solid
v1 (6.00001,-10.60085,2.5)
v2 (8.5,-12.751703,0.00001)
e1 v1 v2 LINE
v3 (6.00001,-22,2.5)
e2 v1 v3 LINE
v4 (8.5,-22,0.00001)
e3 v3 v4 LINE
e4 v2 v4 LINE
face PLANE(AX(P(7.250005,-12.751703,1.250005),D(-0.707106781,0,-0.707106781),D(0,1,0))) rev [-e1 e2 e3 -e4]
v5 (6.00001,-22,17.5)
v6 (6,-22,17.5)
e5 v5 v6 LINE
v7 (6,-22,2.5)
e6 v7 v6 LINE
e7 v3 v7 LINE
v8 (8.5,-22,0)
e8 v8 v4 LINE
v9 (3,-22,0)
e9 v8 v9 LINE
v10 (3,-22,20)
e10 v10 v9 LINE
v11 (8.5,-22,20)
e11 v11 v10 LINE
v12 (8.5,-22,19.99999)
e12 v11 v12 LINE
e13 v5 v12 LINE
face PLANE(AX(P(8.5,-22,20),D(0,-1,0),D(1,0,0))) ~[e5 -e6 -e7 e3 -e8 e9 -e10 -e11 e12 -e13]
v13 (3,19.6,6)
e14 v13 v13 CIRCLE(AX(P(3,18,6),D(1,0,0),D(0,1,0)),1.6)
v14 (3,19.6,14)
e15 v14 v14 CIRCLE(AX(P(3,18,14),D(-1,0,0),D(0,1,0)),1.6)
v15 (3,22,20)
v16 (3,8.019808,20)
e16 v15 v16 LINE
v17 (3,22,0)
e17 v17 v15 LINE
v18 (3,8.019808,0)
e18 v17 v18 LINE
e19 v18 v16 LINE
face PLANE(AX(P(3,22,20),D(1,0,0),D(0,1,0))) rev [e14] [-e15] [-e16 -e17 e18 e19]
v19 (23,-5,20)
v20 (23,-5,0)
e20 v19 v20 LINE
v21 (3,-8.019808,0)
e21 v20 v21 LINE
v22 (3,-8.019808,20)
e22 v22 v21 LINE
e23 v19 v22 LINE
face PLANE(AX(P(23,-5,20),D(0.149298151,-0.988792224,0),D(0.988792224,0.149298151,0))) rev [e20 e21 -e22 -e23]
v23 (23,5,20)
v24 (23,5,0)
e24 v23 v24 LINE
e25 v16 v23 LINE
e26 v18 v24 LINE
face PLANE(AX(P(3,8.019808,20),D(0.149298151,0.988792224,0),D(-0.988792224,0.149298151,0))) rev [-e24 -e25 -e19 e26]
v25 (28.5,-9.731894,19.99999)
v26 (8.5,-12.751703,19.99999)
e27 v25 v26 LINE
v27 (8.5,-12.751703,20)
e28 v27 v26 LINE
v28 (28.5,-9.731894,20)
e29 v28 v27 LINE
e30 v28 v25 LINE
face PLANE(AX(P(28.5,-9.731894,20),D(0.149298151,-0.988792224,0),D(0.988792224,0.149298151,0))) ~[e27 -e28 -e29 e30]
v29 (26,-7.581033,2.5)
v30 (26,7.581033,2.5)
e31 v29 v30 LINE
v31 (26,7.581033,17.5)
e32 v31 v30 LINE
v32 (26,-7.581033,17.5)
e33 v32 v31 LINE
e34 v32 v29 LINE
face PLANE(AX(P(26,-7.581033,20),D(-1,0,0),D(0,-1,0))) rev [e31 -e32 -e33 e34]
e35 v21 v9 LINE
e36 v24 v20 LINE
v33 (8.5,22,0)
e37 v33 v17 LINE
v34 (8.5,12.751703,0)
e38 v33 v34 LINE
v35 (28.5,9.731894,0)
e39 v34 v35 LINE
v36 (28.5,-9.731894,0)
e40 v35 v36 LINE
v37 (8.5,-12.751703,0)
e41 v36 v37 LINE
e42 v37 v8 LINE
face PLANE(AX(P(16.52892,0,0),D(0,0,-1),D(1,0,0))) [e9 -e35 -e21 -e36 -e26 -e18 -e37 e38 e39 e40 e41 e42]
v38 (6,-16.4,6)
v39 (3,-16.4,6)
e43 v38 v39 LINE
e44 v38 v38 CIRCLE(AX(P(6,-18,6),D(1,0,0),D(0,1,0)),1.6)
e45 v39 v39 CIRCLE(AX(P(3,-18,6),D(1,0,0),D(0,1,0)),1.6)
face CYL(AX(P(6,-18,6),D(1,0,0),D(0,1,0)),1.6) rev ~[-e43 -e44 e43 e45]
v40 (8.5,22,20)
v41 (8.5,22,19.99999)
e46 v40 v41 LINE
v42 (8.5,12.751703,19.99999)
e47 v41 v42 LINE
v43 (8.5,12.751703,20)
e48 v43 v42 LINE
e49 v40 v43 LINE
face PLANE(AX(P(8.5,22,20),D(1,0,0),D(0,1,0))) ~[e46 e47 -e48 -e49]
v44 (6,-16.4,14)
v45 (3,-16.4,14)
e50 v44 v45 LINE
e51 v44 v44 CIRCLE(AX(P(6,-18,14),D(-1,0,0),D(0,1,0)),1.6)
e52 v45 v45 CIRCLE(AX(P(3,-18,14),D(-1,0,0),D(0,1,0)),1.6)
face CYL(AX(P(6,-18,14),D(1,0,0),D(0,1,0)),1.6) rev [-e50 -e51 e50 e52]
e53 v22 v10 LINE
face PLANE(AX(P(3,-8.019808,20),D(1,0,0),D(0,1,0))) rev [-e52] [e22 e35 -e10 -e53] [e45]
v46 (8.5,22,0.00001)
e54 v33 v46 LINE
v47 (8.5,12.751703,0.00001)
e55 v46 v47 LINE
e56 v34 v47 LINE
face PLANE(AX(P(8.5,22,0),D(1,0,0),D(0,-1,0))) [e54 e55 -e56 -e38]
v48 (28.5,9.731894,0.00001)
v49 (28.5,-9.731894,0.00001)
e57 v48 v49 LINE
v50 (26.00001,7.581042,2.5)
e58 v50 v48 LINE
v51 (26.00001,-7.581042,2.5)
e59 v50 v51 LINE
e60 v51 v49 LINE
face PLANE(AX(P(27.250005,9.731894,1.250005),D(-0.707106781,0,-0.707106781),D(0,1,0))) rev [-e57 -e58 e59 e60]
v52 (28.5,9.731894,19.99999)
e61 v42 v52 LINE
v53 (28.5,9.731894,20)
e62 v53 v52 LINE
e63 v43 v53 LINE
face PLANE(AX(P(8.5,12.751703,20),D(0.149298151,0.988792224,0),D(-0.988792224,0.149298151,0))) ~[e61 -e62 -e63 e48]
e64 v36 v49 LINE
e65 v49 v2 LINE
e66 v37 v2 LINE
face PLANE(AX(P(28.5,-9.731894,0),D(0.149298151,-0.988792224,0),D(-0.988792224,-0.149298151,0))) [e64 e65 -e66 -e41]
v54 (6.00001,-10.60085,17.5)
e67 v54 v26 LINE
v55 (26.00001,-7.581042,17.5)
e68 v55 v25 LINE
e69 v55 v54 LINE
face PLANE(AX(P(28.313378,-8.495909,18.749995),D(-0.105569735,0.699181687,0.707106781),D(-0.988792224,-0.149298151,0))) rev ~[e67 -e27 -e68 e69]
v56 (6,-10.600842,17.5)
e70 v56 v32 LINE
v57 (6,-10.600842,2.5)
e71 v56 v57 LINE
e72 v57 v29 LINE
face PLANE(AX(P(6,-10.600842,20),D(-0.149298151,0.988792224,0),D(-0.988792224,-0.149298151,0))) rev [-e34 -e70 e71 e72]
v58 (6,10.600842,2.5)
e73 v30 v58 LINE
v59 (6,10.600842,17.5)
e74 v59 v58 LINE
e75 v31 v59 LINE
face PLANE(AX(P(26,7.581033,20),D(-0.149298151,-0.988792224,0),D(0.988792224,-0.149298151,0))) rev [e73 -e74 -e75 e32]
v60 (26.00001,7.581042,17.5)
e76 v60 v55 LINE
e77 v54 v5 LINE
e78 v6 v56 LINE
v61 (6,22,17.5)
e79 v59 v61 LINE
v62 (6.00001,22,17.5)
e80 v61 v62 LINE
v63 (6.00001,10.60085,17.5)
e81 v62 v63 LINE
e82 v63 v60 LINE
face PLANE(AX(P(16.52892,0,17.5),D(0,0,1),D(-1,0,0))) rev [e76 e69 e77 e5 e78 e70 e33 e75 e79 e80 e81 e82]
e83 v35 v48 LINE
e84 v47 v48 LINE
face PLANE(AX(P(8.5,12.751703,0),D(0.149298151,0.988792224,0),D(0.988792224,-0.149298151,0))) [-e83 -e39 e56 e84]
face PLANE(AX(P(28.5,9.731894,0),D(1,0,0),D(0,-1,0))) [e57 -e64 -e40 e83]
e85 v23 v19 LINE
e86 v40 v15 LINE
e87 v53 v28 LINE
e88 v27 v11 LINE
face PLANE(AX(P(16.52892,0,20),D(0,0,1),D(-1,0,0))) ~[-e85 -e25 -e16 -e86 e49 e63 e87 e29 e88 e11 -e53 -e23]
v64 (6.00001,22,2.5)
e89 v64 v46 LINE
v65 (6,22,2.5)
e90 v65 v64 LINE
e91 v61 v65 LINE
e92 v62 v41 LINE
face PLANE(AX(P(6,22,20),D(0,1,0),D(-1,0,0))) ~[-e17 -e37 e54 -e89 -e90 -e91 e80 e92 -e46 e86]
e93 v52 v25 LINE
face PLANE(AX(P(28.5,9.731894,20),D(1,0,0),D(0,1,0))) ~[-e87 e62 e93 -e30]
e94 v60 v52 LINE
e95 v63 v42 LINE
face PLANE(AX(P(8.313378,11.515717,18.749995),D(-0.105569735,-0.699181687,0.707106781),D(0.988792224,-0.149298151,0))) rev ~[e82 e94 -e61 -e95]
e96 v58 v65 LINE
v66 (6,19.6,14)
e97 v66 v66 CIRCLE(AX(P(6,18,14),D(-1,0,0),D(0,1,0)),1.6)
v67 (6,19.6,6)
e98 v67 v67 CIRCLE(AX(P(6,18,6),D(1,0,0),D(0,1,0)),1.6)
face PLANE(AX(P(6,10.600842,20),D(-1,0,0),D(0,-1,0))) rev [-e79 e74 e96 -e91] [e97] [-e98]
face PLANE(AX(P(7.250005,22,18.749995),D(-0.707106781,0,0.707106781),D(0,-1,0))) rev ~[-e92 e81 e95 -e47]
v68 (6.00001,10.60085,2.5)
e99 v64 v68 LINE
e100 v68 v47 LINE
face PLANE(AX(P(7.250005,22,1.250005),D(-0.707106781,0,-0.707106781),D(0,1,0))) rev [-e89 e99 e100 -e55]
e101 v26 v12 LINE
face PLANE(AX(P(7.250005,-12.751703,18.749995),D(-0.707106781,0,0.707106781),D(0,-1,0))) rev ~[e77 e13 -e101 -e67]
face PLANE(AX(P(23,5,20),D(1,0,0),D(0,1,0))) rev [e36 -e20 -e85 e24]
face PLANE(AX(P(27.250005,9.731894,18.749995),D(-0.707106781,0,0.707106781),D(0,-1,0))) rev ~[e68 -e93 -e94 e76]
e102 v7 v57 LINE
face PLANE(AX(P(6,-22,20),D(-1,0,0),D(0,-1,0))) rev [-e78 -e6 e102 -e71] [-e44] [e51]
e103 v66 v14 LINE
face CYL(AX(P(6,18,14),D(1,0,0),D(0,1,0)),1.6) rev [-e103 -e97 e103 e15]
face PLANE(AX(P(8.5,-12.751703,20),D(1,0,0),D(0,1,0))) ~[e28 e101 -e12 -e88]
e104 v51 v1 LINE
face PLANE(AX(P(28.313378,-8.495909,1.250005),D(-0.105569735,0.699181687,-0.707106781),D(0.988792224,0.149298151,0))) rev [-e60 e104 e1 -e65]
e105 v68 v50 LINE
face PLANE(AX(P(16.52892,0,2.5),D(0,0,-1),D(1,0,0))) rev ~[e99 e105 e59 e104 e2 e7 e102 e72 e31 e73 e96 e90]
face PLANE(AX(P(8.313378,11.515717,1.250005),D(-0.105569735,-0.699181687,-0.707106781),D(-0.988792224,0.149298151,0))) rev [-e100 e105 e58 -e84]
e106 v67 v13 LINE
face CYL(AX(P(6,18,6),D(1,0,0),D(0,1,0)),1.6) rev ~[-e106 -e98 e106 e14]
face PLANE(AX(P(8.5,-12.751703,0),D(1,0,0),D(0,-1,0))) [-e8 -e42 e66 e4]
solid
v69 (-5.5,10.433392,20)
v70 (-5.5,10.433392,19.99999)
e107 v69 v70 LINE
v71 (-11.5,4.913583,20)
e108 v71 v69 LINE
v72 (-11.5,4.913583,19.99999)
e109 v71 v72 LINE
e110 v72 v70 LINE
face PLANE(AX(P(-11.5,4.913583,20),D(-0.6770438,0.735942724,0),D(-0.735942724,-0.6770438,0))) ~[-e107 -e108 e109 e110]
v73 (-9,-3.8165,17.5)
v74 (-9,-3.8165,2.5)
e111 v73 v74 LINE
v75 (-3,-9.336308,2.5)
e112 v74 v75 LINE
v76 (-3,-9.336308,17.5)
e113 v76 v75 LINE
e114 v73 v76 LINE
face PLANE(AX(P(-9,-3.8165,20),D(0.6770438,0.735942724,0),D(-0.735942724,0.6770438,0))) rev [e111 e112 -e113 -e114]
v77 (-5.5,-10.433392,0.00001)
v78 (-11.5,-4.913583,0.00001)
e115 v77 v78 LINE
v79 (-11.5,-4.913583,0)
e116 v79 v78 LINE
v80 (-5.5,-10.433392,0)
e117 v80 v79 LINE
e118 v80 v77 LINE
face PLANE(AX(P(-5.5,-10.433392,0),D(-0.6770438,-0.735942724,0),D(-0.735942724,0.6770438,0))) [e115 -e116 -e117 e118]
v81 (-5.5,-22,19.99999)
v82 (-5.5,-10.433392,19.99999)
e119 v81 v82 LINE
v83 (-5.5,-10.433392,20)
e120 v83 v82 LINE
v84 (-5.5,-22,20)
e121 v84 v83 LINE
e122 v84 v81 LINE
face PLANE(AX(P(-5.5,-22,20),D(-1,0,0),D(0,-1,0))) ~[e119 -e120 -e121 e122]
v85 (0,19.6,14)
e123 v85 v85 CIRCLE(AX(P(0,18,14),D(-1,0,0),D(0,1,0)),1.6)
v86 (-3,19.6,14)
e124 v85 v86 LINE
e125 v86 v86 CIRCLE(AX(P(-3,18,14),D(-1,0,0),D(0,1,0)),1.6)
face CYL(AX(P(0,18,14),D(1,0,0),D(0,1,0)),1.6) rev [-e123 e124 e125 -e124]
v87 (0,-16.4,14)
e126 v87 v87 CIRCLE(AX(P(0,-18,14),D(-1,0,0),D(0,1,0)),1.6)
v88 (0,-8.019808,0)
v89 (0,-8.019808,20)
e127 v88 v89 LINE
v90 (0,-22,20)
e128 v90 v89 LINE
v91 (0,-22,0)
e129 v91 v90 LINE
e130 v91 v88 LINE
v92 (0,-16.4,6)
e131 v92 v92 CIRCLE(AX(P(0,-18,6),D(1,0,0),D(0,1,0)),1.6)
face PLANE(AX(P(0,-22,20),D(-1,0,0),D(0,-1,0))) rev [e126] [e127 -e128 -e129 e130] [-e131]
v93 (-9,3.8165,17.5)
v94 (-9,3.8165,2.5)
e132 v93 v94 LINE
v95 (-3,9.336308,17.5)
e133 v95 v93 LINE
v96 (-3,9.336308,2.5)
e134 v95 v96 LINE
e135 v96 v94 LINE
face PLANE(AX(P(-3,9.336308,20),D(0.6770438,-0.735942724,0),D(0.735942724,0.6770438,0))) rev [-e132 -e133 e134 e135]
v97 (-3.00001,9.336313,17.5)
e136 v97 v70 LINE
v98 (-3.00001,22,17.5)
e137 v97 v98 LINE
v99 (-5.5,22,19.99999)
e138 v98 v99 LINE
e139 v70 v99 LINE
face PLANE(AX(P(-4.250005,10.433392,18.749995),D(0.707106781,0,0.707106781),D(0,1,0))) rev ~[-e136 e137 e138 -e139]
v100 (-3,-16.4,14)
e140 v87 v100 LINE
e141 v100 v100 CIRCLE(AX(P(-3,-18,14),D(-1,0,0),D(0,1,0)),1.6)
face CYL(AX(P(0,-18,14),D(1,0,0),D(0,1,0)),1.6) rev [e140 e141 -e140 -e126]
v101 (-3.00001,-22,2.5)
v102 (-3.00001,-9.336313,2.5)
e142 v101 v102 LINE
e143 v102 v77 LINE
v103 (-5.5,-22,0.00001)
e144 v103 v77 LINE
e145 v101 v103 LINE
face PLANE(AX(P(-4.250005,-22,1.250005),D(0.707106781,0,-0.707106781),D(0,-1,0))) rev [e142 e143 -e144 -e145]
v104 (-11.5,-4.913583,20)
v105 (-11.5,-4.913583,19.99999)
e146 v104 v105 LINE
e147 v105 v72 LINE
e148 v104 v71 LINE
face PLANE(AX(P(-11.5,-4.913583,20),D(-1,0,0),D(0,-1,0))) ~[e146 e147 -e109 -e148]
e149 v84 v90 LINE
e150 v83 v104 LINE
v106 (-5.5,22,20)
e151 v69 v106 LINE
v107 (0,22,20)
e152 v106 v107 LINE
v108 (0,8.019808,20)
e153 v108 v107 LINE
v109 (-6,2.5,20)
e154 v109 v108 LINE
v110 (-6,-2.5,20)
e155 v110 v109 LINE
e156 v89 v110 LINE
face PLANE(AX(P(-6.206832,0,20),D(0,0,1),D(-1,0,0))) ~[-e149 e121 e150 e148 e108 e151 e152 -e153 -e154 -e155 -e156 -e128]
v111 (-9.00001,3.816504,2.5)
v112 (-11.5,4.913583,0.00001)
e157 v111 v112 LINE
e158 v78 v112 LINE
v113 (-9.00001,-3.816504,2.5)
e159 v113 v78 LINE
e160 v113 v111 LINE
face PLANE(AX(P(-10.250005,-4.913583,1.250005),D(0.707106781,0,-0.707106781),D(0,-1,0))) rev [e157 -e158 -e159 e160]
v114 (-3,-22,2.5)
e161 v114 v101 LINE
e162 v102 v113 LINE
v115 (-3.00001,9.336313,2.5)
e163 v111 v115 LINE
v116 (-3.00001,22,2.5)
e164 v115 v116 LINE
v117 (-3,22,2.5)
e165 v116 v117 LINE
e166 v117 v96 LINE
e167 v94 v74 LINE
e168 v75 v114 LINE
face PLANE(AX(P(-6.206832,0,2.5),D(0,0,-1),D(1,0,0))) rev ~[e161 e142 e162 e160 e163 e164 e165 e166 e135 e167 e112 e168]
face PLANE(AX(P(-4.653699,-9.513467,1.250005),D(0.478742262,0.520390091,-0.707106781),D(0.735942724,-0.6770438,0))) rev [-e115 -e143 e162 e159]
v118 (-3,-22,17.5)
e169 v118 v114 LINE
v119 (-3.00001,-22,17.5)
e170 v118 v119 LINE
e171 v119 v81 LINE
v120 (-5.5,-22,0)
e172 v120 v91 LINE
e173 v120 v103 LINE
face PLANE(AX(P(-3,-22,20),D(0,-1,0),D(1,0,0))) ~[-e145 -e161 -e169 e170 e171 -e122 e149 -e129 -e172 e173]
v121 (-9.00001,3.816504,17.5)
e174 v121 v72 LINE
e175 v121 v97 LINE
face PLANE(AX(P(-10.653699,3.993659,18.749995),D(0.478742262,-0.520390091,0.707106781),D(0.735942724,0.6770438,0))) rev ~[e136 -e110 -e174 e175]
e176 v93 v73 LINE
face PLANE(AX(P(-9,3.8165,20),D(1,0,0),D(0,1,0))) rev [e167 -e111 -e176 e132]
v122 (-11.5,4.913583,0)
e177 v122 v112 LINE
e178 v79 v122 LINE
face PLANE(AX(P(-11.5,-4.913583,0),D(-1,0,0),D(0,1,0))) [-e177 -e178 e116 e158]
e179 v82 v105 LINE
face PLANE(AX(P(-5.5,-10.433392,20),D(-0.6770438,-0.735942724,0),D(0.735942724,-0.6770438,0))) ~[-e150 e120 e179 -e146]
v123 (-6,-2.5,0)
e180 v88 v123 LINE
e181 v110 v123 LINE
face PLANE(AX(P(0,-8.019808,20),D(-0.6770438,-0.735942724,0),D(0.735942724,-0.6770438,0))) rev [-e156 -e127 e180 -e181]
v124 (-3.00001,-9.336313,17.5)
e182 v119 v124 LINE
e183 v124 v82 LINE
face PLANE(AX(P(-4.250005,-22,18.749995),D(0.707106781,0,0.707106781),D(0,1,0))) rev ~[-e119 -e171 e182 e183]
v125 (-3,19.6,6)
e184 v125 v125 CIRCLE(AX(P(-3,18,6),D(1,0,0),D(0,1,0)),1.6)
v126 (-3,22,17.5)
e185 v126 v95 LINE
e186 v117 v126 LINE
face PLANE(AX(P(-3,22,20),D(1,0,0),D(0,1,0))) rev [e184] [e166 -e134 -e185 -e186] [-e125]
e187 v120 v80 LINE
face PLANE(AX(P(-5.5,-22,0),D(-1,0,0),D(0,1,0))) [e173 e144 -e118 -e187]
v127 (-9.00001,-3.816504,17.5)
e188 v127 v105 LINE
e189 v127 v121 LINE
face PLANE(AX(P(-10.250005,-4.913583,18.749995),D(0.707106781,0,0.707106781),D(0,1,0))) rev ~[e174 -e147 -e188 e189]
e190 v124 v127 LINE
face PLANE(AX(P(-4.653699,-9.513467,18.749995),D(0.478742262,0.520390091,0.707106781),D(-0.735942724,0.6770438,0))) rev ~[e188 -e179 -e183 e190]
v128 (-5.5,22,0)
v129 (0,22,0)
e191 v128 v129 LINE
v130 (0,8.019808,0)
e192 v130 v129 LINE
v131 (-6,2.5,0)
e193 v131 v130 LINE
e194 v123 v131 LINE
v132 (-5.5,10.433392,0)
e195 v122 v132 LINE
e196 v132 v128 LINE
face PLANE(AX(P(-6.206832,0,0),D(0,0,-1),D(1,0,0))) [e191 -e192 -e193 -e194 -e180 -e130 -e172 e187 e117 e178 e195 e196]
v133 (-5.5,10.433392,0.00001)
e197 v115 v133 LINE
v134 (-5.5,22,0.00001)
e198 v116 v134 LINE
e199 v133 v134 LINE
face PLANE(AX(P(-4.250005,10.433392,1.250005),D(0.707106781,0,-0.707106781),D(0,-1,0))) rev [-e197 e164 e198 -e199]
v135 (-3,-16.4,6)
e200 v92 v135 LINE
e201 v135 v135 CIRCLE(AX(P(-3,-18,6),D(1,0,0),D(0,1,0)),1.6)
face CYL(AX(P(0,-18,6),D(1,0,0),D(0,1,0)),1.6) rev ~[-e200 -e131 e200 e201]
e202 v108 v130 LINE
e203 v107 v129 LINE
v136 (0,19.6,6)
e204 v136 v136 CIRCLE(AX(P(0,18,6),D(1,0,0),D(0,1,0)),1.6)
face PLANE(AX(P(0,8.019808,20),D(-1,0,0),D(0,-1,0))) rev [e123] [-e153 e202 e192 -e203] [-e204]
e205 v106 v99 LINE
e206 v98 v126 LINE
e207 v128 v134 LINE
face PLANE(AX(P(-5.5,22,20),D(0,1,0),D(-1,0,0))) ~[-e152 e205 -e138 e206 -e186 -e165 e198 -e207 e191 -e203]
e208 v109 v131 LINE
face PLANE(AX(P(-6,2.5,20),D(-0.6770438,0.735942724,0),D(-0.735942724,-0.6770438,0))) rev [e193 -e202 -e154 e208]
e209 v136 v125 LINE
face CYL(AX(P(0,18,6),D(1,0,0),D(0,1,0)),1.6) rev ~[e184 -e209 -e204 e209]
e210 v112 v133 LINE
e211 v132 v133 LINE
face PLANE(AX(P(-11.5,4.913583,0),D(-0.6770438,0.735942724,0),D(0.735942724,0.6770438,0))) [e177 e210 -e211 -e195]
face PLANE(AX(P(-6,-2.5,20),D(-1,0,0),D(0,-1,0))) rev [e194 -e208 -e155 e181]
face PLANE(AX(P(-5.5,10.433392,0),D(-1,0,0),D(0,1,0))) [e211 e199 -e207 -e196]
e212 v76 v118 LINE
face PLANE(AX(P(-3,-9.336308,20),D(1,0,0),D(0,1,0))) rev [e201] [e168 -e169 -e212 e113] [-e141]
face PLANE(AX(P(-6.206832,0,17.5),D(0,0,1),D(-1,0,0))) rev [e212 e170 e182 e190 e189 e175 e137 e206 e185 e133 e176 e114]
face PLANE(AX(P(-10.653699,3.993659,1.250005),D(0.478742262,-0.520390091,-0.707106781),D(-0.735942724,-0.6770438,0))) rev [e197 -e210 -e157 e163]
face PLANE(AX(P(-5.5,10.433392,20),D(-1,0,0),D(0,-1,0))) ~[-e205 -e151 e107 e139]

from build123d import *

# Parameters (mm, degrees)
F1_DEPTH   = 10
F2_R       = 1.6
F3_DEPTH   = 3
F5_DEPTH   = 10
F6_R       = 1.6
F7_DEPTH   = 3
F9_DEPTH   = 2.5
F11_DEPTH  = 2.5
F12_SIZE   = 2.49999
F12_2_SIZE = 2.49999


# Not quite as in the source:
# - a fillet or chamfer is up to 0.001 mm smaller than in the source, because OpenCascade refuses the exact size


with BuildPart() as f1:
    # F0 (on Top) → F1 (new body)
    with BuildSketch(Plane.XY):
        Polygon((-3, -22), (0, -22), (0, -8.0198083574), (-6, -2.5), (-6, 2.5), (0, 8.0198083574), (0, 22), (-3, 22), (-3, 9.3363083632), (-9, 3.8165000058), (-9, 0), (-9, -3.8165000058), (-3, -9.3363083632), align=None)
    extrude(amount=F1_DEPTH)

    # F2 (on face) → F3 (cut, through all)
    with BuildSketch(Plane.YZ):
        with Locations((-18, 6)):
            Circle(F2_R)
        with Locations((18, 6)):
            Circle(F2_R)
    extrude(amount=-F3_DEPTH, mode=Mode.SUBTRACT)

    # F8 (on face) → F9 (join)
    with BuildSketch(Plane(origin=(0, 0, 0), x_dir=(1, 0, 0), z_dir=(0, 0, -1))):
        Polygon((-3, 9.3363083632), (-3, 22), (-5.5, 22), (-5.5, 10.4333917014), (-11.5, 4.913583344), (-11.5, -4.913583344), (-5.5, -10.4333917014), (-5.5, -22), (-3, -22), (-3, -9.3363083632), (-9, -3.8165000058), (-9, 3.8165000058), align=None)
    extrude(amount=-F9_DEPTH)

    # F12#2 (size 2.5 in the source; OpenCascade refuses exactly that, so slightly less here)
    f12_2_edges = [f1.edges().sort_by_distance(p)[0] for p in [
        (-5.5, 16.216696, 2.5),
        (-8.5, 7.673488, 2.5),
        (-11.5, 0, 2.5),
        (-8.5, -7.673488, 2.5),
        (-5.5, -16.216696, 2.5),
    ]]
    chamfer(f12_2_edges, length=F12_2_SIZE)



with BuildPart() as f5:
    # F4 (on Top) → F5 (new body)
    with BuildSketch(Plane.XY):
        Polygon((3, -8.0198083574), (3, -22), (6, -22), (6, -10.6008415462), (26, -7.5810331888), (26, 7.5810331888), (6, 10.6008415462), (6, 22), (3, 22), (3, 8.0198083574), (23, 5), (23, 0), (23, -5), align=None)
    extrude(amount=F5_DEPTH)

    # F6 (on face) → F7 (cut, through all)
    with BuildSketch(Plane.YZ.offset(6)):
        with Locations((-18, 6)):
            Circle(F6_R)
        with Locations((18, 6)):
            Circle(F6_R)
    extrude(amount=-F7_DEPTH, mode=Mode.SUBTRACT)

    # F10 (on face) → F11 (join)
    with BuildSketch(Plane(origin=(0, 0, 0), x_dir=(1, 0, 0), z_dir=(0, 0, -1))):
        Polygon((6, -10.6008415462), (6, -22), (8.5, -22), (8.5, -12.7517025368), (28.5, -9.7318941795), (28.5, 9.7318941795), (8.5, 12.7517025368), (8.5, 22), (6, 22), (6, 10.6008415462), (26, 7.5810331888), (26, -7.5810331888), align=None)
    extrude(amount=-F11_DEPTH)

    # F12 (size 2.5 in the source; OpenCascade refuses exactly that, so slightly less here)
    f12_edges = [f5.edges().sort_by_distance(p)[0] for p in [
        (8.5, 17.375851, 2.5),
        (18.5, 11.241798, 2.5),
        (28.5, 0, 2.5),
        (18.5, -11.241798, 2.5),
        (8.5, -17.375851, 2.5),
    ]]
    chamfer(f12_edges, length=F12_SIZE)


with BuildPart() as f1_1:
    add(f1.part)

    add(f5.part)  # F13 merges F5
    # F13: F1, F5 across face
    add(f1.part.mirror(Plane(origin=(-3.2621858931, 0, 10), x_dir=(1, 0, 0), z_dir=(0, 0, 1))))
    add(f5.part.mirror(Plane(origin=(-3.2621858931, 0, 10), x_dir=(1, 0, 0), z_dir=(0, 0, 1))))


solid = f1_1.part
